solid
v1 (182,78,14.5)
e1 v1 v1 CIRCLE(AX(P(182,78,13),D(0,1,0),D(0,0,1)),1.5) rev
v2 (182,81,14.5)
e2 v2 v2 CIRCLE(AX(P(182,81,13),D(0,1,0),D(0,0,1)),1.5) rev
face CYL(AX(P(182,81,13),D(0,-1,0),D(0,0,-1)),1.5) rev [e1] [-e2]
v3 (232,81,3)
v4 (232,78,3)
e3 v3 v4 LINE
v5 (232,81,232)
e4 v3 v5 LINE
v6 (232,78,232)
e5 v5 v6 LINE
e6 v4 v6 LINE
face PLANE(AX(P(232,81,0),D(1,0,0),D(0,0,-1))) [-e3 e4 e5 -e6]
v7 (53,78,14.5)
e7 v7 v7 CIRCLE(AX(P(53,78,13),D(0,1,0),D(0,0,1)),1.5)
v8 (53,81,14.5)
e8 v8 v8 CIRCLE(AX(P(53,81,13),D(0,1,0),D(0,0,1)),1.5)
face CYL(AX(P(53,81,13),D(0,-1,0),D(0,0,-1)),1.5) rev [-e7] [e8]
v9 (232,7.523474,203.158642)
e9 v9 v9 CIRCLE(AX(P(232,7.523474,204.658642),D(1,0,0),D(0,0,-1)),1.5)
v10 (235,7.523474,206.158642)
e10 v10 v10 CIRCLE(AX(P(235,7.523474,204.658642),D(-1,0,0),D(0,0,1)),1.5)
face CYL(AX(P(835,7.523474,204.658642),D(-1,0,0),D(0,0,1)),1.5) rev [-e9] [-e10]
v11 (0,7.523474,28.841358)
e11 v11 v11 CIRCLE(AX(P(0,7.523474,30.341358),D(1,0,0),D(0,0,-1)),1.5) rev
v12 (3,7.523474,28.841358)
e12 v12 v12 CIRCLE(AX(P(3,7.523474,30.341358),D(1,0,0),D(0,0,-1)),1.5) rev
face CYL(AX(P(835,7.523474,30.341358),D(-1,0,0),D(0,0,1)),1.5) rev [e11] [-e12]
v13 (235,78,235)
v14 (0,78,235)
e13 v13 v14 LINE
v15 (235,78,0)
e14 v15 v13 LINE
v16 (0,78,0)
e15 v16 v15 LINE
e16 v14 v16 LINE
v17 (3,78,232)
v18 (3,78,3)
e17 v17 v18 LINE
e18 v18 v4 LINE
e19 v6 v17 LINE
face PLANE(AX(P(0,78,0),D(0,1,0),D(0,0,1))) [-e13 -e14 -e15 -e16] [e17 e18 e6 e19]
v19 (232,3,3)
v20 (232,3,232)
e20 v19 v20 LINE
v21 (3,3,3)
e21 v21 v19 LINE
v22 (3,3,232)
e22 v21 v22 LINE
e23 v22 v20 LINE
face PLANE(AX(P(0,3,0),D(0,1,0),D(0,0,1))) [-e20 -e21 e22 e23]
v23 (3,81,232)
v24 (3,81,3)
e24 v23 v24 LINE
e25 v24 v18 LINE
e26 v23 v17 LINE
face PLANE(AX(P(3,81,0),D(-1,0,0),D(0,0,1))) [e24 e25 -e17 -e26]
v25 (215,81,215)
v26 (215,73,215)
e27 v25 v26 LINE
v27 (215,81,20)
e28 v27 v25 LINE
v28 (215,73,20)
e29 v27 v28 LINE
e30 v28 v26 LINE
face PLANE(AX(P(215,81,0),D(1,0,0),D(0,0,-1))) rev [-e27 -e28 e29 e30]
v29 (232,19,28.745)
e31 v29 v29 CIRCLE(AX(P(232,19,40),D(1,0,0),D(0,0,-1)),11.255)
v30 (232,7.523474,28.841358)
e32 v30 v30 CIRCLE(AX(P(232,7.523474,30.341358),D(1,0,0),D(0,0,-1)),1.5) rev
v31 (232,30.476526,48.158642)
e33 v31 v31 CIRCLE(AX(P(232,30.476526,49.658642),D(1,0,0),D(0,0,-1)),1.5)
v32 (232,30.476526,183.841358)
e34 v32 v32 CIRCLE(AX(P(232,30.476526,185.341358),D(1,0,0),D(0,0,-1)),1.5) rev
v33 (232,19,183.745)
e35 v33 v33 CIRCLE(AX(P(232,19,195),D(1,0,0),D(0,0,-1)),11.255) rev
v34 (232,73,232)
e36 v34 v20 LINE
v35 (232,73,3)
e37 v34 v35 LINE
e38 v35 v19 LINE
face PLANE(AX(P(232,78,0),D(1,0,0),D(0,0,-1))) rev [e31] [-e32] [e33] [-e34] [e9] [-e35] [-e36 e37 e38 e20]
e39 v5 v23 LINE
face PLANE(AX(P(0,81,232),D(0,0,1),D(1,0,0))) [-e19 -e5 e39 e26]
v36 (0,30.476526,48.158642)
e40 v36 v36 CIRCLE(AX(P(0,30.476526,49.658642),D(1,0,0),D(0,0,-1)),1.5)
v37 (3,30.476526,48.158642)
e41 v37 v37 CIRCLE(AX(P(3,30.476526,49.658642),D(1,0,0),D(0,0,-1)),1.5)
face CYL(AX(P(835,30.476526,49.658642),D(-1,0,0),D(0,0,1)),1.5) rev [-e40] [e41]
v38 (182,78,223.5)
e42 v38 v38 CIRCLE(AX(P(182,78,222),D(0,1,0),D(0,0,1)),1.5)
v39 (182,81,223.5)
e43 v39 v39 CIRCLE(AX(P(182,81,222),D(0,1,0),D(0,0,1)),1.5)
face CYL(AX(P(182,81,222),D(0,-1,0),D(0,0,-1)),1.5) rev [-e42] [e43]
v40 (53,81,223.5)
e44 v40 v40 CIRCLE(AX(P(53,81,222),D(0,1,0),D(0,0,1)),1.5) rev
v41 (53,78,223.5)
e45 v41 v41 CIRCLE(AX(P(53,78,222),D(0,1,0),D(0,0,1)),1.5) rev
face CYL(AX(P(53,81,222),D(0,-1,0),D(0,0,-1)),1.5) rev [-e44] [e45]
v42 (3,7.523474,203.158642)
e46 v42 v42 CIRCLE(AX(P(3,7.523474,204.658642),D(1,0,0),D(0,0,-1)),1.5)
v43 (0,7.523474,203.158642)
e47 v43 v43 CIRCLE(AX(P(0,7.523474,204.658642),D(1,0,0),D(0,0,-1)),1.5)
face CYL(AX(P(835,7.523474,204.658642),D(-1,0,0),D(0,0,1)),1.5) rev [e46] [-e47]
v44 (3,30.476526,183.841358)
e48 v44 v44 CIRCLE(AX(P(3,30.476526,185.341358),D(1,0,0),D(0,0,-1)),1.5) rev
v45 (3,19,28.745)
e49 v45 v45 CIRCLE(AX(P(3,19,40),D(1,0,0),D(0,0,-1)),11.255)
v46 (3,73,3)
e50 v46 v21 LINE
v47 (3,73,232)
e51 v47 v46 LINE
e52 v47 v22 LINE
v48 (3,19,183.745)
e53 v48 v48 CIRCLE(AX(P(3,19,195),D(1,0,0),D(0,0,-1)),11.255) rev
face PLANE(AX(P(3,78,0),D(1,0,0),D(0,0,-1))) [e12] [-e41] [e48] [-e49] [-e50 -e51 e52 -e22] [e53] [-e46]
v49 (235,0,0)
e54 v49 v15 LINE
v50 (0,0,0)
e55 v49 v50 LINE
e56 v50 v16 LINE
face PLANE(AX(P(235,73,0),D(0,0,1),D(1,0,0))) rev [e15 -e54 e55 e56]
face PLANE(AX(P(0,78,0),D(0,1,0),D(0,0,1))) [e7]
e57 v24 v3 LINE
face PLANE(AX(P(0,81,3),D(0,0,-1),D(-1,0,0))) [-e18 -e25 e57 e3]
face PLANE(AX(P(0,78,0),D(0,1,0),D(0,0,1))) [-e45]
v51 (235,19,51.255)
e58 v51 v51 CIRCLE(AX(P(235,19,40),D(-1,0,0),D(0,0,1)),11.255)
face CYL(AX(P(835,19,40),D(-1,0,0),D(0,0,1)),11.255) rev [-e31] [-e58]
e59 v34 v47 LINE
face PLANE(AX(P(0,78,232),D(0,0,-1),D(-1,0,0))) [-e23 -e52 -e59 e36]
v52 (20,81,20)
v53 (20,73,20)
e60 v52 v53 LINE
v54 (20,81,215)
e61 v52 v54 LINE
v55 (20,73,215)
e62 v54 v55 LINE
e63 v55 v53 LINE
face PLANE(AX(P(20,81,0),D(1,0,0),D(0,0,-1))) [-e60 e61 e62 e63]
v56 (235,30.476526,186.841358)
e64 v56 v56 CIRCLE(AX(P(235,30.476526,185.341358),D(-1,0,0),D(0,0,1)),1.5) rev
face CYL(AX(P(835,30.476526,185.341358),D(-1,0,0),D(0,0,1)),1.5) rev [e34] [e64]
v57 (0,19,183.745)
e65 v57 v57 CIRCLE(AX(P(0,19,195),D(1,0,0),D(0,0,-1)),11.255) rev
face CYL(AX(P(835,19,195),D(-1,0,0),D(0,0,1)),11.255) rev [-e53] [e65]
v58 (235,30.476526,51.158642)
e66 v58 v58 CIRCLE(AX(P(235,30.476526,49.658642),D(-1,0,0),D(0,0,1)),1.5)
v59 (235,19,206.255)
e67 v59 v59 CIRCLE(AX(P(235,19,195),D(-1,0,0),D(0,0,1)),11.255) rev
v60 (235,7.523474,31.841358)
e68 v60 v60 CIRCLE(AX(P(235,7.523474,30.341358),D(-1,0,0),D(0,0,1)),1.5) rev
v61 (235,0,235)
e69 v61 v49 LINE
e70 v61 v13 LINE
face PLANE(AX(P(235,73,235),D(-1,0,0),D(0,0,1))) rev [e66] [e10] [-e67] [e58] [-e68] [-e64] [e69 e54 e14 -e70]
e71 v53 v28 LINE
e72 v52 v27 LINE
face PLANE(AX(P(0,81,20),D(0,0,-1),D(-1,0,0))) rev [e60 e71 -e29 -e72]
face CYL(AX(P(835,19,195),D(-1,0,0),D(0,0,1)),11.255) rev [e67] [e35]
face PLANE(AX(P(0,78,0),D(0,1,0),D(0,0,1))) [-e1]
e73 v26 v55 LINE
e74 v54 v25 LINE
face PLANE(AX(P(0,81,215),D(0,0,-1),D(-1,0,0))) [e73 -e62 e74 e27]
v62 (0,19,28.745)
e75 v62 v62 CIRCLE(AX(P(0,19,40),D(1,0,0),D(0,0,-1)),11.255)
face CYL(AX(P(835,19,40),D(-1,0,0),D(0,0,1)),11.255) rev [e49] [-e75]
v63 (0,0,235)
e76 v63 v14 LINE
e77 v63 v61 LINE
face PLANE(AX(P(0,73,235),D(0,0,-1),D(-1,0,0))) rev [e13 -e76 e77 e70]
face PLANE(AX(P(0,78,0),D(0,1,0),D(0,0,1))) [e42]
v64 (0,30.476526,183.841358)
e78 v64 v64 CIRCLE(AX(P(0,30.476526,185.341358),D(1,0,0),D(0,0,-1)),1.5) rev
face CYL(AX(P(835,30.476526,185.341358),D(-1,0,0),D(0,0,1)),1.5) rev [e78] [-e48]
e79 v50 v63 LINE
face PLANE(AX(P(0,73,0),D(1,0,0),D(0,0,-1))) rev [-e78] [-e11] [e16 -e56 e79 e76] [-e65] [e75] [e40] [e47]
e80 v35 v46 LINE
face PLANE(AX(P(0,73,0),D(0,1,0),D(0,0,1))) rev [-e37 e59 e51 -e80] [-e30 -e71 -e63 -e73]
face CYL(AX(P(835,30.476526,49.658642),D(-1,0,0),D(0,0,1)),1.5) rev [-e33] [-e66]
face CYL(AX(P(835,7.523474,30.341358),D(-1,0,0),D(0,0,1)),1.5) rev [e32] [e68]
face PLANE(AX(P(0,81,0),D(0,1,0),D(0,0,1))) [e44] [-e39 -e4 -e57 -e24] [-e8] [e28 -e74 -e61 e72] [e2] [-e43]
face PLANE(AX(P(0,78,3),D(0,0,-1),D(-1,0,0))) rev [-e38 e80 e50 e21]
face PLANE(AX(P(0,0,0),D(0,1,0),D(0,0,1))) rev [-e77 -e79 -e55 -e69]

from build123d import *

# Parameters (mm, degrees)
SKETCH2_W               = 235
SKETCH2_H               = 235
BOSS_EXTRUDE1_DEPTH     = 3
SKETCH3_W               = 229
SKETCH3_H               = 229
BOSS_EXTRUDE3_DEPTH     = 75
SKETCH6_W               = 229
SKETCH6_H               = 229
SKETCH6_R               = 1.5
SKETCH6_W_2             = 195
SKETCH6_H_2             = 195
BOSS_EXTRUDE4_DEPTH     = 3
CUT_EXTRUDE1_DEPTH      = 600
CUT_EXTRUDE1_DEPTH_BACK = 600
SKETCH9_R               = 11.255
SKETCH9_R_2             = 1.5
SKETCH12_W              = 235
SKETCH12_H              = 235
SKETCH12_W_2            = 195
SKETCH12_H_2            = 195
BOSS_EXTRUDE5_DEPTH     = 5


with BuildPart() as part:
    # Sketch2 → Boss-Extrude1 (new body)
    with BuildSketch(Plane(origin=(0, 0, 0), x_dir=(1, 0, 0), z_dir=(0, 1, 0))):
        with Locations((117.5, -117.5)):
            Rectangle(SKETCH2_W, SKETCH2_H)
    extrude(amount=BOSS_EXTRUDE1_DEPTH)

    # Sketch3 → Boss-Extrude3 (add)
    with BuildSketch(Plane(origin=(0, 3, 0), x_dir=(1, 0, 0), z_dir=(0, 1, 0))):
        Polygon((3, 0), (0, 0), (0, -3), (0, -232), (0, -235), (3, -235), (232, -235), (235, -235), (235, -232), (235, -3), (235, 0), (232, 0), align=None)
        with Locations((117.5, -117.5)):
            Rectangle(SKETCH3_W, SKETCH3_H, mode=Mode.SUBTRACT)
    extrude(amount=BOSS_EXTRUDE3_DEPTH)

    # Sketch9 → Cut-Extrude1 (cut, two sides: drawn at the far end of the back side and taken through both)
    with BuildSketch(Plane(origin=(235, 0, 0), x_dir=(0, 0, -1), z_dir=(1, 0, 0)).offset(-CUT_EXTRUDE1_DEPTH_BACK)):
        with Locations((-195, 19)):
            Circle(SKETCH9_R)
        with Locations((-40, 19)):
            Circle(SKETCH9_R)
        with Locations((-185.341358162, 30.476525513)):
            Circle(SKETCH9_R_2)
        with Locations((-204.658641838, 7.523474487)):
            Circle(SKETCH9_R_2)
        with Locations((-30.341358162, 7.523474487)):
            Circle(SKETCH9_R_2)
        with Locations((-49.658641838, 30.476525513)):
            Circle(SKETCH9_R_2)
    extrude(amount=CUT_EXTRUDE1_DEPTH + CUT_EXTRUDE1_DEPTH_BACK, mode=Mode.SUBTRACT)



with BuildPart() as body_2:
    # Sketch6 → Boss-Extrude4 (new body)
    with BuildSketch(Plane(origin=(0, 78, 0), x_dir=(1, 0, 0), z_dir=(0, 1, 0))):
        with Locations((117.5, -117.5)):
            Rectangle(SKETCH6_W, SKETCH6_H)
        with Locations((53, -222)):
            Circle(SKETCH6_R, mode=Mode.SUBTRACT)
        with Locations((182, -222)):
            Circle(SKETCH6_R, mode=Mode.SUBTRACT)
        with Locations((117.5, -117.5)):
            Rectangle(SKETCH6_W_2, SKETCH6_H_2, mode=Mode.SUBTRACT)
        with Locations((53, -13)):
            Circle(SKETCH6_R, mode=Mode.SUBTRACT)
        with Locations((182, -13)):
            Circle(SKETCH6_R, mode=Mode.SUBTRACT)
    extrude(amount=BOSS_EXTRUDE4_DEPTH)


with BuildPart() as part_1:
    add(part.part)

    add(body_2.part)  # Boss-Extrude5 merges body 2
    # Sketch12 → Boss-Extrude5 (add)
    with BuildSketch(Plane.XZ.offset(-78)):
        with Locations((117.5, 117.5)):
            Rectangle(SKETCH12_W, SKETCH12_H)
        with Locations((117.5, 117.5)):
            Rectangle(SKETCH12_W_2, SKETCH12_H_2, mode=Mode.SUBTRACT)
    extrude(amount=BOSS_EXTRUDE5_DEPTH)


solid = part_1.part
